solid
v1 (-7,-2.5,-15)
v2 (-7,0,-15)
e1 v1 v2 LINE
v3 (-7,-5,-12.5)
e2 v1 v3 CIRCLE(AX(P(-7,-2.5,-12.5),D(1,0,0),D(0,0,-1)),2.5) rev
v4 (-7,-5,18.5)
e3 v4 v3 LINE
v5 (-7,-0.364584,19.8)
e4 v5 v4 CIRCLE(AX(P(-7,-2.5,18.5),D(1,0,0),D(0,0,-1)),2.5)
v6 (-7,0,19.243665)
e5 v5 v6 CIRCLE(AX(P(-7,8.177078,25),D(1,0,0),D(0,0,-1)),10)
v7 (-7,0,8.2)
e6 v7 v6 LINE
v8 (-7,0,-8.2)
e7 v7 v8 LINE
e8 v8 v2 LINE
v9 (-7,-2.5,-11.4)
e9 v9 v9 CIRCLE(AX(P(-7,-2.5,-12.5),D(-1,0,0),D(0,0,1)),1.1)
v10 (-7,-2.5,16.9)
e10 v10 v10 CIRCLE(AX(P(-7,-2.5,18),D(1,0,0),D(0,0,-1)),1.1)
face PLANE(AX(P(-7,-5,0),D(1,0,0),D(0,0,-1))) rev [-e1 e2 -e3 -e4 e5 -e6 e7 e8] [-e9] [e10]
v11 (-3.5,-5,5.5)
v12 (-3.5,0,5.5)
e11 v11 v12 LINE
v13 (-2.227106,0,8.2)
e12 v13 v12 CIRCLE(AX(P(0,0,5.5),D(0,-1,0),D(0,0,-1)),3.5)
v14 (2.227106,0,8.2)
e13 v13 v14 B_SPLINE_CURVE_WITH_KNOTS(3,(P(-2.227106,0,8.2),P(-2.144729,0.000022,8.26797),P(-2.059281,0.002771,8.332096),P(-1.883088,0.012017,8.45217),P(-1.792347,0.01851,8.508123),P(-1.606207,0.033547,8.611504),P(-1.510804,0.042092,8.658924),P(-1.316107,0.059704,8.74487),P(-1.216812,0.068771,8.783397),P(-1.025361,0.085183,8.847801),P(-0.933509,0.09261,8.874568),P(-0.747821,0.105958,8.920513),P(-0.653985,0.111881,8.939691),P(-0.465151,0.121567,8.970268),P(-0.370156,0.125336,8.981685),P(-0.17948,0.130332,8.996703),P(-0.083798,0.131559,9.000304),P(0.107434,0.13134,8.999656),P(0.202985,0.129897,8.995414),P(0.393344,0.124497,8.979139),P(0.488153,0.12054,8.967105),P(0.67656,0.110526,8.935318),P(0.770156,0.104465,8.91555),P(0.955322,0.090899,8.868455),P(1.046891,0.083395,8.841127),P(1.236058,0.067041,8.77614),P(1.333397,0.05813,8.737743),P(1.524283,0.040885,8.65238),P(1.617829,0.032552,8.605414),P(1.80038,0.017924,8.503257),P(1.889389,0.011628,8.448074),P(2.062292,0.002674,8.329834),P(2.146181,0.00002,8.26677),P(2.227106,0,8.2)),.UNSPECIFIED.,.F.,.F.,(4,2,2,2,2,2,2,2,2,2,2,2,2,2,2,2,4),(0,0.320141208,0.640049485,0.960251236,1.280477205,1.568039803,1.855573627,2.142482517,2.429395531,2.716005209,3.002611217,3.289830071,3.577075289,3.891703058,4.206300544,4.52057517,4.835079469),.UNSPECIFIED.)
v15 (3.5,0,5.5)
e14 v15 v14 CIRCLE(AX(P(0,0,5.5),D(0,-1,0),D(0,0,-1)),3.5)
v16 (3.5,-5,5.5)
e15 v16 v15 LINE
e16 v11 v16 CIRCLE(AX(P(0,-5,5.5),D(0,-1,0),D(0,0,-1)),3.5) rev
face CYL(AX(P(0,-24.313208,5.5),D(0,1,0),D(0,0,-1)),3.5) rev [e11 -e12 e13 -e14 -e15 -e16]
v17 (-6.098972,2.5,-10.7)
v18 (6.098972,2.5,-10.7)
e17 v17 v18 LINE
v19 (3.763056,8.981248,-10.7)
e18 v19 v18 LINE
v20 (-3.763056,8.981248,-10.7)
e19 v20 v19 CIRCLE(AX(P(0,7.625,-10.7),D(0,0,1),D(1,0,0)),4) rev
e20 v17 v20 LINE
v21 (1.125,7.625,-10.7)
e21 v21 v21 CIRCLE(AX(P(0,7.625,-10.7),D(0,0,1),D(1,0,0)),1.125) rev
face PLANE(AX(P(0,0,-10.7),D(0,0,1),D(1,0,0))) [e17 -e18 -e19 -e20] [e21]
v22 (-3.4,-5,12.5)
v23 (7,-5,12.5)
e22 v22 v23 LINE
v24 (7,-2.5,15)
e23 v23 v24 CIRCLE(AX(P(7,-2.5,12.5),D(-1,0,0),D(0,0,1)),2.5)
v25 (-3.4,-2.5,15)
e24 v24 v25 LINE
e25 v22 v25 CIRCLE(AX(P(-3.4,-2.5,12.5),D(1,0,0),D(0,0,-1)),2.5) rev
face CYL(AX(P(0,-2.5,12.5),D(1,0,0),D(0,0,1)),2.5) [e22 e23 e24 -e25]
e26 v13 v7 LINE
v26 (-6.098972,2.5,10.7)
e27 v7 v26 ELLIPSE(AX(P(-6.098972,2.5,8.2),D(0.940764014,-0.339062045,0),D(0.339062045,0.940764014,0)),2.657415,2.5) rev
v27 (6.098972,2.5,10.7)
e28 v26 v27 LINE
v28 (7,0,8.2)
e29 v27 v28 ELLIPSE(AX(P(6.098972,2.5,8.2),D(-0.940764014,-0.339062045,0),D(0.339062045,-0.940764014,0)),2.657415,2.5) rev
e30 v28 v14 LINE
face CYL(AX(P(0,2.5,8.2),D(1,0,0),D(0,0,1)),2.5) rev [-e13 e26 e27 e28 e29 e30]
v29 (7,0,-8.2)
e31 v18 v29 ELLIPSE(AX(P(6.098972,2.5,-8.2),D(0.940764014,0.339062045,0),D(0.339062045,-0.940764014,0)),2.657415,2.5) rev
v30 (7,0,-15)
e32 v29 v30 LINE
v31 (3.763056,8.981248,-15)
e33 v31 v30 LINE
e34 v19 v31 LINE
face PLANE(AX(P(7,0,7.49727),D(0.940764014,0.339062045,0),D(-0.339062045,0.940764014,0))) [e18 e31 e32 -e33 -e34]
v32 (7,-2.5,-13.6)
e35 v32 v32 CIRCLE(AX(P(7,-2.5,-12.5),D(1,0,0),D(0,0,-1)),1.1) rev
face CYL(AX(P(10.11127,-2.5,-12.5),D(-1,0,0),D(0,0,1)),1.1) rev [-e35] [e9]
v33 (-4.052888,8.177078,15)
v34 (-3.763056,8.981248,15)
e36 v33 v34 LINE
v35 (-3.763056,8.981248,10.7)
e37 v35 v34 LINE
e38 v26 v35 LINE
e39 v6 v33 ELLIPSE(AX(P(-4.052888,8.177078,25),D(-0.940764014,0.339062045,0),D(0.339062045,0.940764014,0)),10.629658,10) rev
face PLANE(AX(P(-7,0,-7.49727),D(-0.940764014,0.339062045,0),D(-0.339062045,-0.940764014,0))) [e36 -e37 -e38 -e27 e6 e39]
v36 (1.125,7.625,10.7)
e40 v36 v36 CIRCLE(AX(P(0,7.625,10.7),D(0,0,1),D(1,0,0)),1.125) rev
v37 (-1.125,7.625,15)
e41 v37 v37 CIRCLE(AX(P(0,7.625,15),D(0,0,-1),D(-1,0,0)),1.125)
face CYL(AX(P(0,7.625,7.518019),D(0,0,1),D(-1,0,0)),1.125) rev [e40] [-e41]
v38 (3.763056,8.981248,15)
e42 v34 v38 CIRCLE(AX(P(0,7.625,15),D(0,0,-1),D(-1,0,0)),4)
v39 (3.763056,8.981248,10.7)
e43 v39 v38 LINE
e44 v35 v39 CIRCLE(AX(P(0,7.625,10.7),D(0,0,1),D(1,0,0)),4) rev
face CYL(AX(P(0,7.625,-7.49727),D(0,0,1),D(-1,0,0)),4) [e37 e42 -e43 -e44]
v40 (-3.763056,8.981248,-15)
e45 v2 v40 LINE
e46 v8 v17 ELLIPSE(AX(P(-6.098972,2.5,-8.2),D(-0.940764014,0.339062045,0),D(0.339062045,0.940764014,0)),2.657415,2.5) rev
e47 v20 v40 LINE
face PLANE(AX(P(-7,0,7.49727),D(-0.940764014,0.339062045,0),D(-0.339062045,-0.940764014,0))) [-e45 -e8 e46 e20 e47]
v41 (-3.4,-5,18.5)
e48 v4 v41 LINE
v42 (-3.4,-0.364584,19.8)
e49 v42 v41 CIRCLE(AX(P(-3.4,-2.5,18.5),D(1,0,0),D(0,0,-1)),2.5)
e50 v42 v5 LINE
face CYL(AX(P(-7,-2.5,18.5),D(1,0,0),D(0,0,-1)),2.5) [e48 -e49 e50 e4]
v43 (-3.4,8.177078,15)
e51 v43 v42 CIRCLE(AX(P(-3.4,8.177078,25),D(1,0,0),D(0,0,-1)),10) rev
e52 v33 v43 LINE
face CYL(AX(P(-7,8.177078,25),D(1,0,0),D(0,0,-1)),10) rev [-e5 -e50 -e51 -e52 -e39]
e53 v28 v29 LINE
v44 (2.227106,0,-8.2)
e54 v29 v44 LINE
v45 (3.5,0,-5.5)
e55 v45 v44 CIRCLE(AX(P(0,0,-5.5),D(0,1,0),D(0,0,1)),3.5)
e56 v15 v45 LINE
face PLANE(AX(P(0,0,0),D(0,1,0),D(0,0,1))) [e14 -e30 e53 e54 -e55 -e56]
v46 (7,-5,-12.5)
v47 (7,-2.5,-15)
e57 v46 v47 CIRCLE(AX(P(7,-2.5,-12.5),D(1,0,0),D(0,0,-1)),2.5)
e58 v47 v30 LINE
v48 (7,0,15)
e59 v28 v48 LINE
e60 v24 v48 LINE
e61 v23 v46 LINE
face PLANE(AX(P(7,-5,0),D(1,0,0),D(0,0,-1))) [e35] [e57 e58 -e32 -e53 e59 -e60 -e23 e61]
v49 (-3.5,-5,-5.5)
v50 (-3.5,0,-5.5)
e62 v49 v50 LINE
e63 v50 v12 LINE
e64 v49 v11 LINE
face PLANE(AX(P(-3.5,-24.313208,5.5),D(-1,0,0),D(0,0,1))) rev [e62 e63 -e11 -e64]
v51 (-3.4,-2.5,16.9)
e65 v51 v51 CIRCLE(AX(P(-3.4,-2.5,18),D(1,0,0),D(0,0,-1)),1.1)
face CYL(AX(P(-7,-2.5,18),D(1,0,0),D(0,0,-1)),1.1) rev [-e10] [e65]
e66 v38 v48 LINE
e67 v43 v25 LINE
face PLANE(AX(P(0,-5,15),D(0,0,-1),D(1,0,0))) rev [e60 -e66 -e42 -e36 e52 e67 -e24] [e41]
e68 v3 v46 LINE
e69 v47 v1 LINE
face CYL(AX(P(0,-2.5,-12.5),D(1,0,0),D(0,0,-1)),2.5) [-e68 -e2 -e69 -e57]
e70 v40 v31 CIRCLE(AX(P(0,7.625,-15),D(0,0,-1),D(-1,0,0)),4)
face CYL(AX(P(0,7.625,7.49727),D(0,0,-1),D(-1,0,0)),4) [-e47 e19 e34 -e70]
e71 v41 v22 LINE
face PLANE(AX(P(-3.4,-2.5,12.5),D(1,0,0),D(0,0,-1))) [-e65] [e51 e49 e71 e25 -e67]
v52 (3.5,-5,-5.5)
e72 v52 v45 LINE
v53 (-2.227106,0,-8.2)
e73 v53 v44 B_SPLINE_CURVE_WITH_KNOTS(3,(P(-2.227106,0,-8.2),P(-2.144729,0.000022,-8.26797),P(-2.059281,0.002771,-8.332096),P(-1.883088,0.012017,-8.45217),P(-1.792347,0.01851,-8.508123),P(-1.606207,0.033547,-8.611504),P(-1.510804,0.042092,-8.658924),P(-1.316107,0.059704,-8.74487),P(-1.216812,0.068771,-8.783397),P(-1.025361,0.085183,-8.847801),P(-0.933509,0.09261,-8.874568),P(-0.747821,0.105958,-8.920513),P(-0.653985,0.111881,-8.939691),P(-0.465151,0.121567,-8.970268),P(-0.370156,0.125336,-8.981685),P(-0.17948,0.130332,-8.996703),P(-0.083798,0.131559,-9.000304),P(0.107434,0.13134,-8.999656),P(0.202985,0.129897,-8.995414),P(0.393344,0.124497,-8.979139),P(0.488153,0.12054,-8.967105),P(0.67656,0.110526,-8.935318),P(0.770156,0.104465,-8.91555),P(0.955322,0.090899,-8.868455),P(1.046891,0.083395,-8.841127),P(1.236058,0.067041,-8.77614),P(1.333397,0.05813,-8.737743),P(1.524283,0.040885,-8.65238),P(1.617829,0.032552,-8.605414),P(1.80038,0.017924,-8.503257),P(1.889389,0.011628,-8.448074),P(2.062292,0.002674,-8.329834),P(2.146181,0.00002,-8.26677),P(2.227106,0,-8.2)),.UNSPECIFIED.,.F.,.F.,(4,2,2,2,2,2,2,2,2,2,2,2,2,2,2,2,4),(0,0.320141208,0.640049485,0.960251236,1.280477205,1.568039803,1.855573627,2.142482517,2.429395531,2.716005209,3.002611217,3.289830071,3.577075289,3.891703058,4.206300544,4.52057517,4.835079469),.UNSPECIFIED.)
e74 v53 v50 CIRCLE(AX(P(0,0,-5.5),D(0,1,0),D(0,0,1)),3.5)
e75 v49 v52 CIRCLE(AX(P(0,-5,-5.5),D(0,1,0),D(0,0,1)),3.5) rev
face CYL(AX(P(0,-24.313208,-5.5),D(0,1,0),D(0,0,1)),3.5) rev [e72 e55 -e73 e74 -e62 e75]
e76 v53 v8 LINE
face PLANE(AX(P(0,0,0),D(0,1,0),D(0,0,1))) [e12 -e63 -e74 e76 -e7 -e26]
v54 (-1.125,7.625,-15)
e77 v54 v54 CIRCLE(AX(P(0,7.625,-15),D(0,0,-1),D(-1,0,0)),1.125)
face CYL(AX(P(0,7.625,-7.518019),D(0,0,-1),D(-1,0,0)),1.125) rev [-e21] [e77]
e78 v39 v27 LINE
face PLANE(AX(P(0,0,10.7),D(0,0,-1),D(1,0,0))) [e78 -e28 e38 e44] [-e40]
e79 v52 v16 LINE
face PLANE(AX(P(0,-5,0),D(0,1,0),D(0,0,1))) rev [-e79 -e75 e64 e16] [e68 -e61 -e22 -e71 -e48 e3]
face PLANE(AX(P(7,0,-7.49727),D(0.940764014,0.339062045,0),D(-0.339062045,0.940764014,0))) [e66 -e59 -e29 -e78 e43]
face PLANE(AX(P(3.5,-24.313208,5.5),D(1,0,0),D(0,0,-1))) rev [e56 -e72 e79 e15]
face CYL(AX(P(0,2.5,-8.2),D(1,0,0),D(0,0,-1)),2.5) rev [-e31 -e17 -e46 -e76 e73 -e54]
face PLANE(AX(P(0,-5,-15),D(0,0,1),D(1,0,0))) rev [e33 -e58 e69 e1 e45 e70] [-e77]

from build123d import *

# Parameters (mm, degrees)
SKETCH1_W                      = 14
SKETCH1_H                      = 15
BOSS_EXTRUDE1_DEPTH            = 5
SKETCH3_R                      = 1.1
CUT_EXTRUDE1_DEPTH             = 14
BOSS_EXTRUDE2_DEPTH            = 4.3
SKETCH5_R                      = 1.125
CUT_EXTRUDE2_DEPTH             = 4.3
FILLET1_R                      = 2.5
CUT_EXTRUDE3_REACH             = 22.227
CUT_EXTRUDE3_DIRECTION_2_REACH = 22.227
BOSS_EXTRUDE4_START            = -14
SKETCH7_R                      = 1.1
BOSS_EXTRUDE4_DEPTH            = 3.6
BOSS_EXTRUDE5_START            = -10.4
SKETCH8_R                      = 1.1
BOSS_EXTRUDE5_DEPTH            = 10.4
FILLET2_R                      = 10


with BuildPart() as part:
    # Sketch1 → Boss-Extrude1 (new body)
    with BuildSketch(Plane(origin=(0, 0, 0), x_dir=(1, 0, 0), z_dir=(0, 1, 0))):
        with Locations((0, 7.5)):
            Rectangle(SKETCH1_W, SKETCH1_H)
    extrude(amount=-BOSS_EXTRUDE1_DEPTH)

    # Sketch3 → Cut-Extrude1 (cut)
    with BuildSketch(Plane.ZY.offset(7)):
        with Locations((-12.5, -2.5)):
            Circle(SKETCH3_R)
    extrude(amount=-CUT_EXTRUDE1_DEPTH, mode=Mode.SUBTRACT)

    # Sketch4 → Boss-Extrude2 (add)
    with BuildSketch(Plane(origin=(0, 0, -15), x_dir=(-1, 0, 0), z_dir=(0, 0, -1))):
        with BuildLine():
            Line((-7, 0), (-3.763056055, 8.981248181))
            ThreePointArc((-3.763056055, 8.981248181), (0, 11.625), (3.763056055, 8.981248181))
            Line((3.763056055, 8.981248181), (7, 0))
            Line((7, 0), (-7, 0))
        make_face()
    extrude(amount=-BOSS_EXTRUDE2_DEPTH)

    # Sketch5 → Cut-Extrude2 (cut)
    with BuildSketch(Plane(origin=(0, 0, -15), x_dir=(-1, 0, 0), z_dir=(0, 0, -1))):
        with Locations((0, 7.625)):
            Circle(SKETCH5_R)
    extrude(amount=-CUT_EXTRUDE2_DEPTH, mode=Mode.SUBTRACT)

    # Fillet1
    fillet1_edges = [part.edges().sort_by_distance(p)[0] for p in [
        (0, -5, -15),
        (0, 0, -10.7),
    ]]
    fillet(fillet1_edges, radius=FILLET1_R)

    # Sketch6 → Cut-Extrude3 (cut, up to next)
    with BuildSketch(Plane(origin=(0, 0, 0), x_dir=(1, 0, 0), z_dir=(0, 1, 0)), mode=Mode.PRIVATE) as cut_extrude3_sk1:
        with BuildLine():
            Line((-3.5, -5.5), (-3.5, 5.5))
            ThreePointArc((-3.5, 5.5), (0, 9), (3.5, 5.5))
            Line((3.5, 5.5), (3.5, -5.5))
            ThreePointArc((3.5, -5.5), (0, -9), (-3.5, -5.5))
        make_face()
    cut_extrude3_tool1 = extrude(cut_extrude3_sk1.sketch, amount=-CUT_EXTRUDE3_REACH, mode=Mode.PRIVATE) & part.part
    add(cut_extrude3_tool1.solids().sort_by_distance((0, 0, 0))[0], mode=Mode.SUBTRACT)

    # Sketch6 → Cut-Extrude3 direction 2 (cut, up to next)
    with BuildSketch(Plane(origin=(0, 0, 0), x_dir=(1, 0, 0), z_dir=(0, 1, 0)), mode=Mode.PRIVATE) as cut_extrude3_direction_2_sk1:
        with BuildLine():
            Line((-3.5, -5.5), (-3.5, 5.5))
            ThreePointArc((-3.5, 5.5), (0, 9), (3.5, 5.5))
            Line((3.5, 5.5), (3.5, -5.5))
            ThreePointArc((3.5, -5.5), (0, -9), (-3.5, -5.5))
        make_face()
    cut_extrude3_direction_2_tool1 = extrude(cut_extrude3_direction_2_sk1.sketch, amount=CUT_EXTRUDE3_DIRECTION_2_REACH, mode=Mode.PRIVATE) & part.part
    add(cut_extrude3_direction_2_tool1.solids().sort_by_distance((0, 0, 0))[0], mode=Mode.SUBTRACT)

    # Mirror1: part across plane


with BuildPart() as part_1:
    add(part.part)
    add(part.part.mirror(Plane.XY))

    # Sketch7 → Boss-Extrude4 (add)
    with BuildSketch(Plane(origin=(7, 0, 0), x_dir=(0, 0, -1), z_dir=(1, 0, 0)).offset(BOSS_EXTRUDE4_START)):
        with BuildLine():
            Line((-12.5, -5), (-18.5, -5))
            ThreePointArc((-18.5, -5), (-21, -2.5), (-18.5, 0))
            Line((-18.5, 0), (-12.5, 0))
            ThreePointArc((-12.5, 0), (-10, -2.5), (-12.5, -5))
        make_face()
        with Locations((-18, -2.5)):
            Circle(SKETCH7_R, mode=Mode.SUBTRACT)
    extrude(amount=BOSS_EXTRUDE4_DEPTH)

    # Sketch8 → Boss-Extrude5 (add)
    with BuildSketch(Plane(origin=(7, 0, 0), x_dir=(0, 0, -1), z_dir=(1, 0, 0)).offset(BOSS_EXTRUDE5_START)):
        with Locations((-12.5, -2.5)):
            Circle(SKETCH8_R)
    extrude(amount=BOSS_EXTRUDE5_DEPTH)

    # Fillet2
    # the kernel refuses this fillet: 10 mm, written as the material it adds along each edge
    with BuildSketch(Plane(origin=(-7, 0, 15), x_dir=(0, 1, 0), z_dir=(1, 0, 0))) as fillet2_piece_1_section:
        with BuildLine():
            CenterArc((8.177078252, 10), FILLET2_R, 211.332251498, 58.667748502)
            Line((-0.36458435, 4.8), (-1.21875061, 4.28))
            ThreePointArc((-1.21875061, 4.28), (-1, 3.5), (-1, 0))
            Line((-1, 0), (0, -1))
            Line((0, -1), (8.177078252, -1))
            Line((8.177078252, -1), (8.177078252, 0))
        make_face()
    fillet2_piece_1 = extrude(amount=3.6, mode=Mode.PRIVATE)
    fillet2_piece_1 = split(fillet2_piece_1, bisect_by=Plane(origin=(-6.281736491, 1.992899149, 16.030712871), z_dir=(0.9407640136683284, -0.33906204533485823, 0)), keep=Keep.TOP, mode=Mode.PRIVATE)
    add(fillet2_piece_1)


solid = part_1.part
